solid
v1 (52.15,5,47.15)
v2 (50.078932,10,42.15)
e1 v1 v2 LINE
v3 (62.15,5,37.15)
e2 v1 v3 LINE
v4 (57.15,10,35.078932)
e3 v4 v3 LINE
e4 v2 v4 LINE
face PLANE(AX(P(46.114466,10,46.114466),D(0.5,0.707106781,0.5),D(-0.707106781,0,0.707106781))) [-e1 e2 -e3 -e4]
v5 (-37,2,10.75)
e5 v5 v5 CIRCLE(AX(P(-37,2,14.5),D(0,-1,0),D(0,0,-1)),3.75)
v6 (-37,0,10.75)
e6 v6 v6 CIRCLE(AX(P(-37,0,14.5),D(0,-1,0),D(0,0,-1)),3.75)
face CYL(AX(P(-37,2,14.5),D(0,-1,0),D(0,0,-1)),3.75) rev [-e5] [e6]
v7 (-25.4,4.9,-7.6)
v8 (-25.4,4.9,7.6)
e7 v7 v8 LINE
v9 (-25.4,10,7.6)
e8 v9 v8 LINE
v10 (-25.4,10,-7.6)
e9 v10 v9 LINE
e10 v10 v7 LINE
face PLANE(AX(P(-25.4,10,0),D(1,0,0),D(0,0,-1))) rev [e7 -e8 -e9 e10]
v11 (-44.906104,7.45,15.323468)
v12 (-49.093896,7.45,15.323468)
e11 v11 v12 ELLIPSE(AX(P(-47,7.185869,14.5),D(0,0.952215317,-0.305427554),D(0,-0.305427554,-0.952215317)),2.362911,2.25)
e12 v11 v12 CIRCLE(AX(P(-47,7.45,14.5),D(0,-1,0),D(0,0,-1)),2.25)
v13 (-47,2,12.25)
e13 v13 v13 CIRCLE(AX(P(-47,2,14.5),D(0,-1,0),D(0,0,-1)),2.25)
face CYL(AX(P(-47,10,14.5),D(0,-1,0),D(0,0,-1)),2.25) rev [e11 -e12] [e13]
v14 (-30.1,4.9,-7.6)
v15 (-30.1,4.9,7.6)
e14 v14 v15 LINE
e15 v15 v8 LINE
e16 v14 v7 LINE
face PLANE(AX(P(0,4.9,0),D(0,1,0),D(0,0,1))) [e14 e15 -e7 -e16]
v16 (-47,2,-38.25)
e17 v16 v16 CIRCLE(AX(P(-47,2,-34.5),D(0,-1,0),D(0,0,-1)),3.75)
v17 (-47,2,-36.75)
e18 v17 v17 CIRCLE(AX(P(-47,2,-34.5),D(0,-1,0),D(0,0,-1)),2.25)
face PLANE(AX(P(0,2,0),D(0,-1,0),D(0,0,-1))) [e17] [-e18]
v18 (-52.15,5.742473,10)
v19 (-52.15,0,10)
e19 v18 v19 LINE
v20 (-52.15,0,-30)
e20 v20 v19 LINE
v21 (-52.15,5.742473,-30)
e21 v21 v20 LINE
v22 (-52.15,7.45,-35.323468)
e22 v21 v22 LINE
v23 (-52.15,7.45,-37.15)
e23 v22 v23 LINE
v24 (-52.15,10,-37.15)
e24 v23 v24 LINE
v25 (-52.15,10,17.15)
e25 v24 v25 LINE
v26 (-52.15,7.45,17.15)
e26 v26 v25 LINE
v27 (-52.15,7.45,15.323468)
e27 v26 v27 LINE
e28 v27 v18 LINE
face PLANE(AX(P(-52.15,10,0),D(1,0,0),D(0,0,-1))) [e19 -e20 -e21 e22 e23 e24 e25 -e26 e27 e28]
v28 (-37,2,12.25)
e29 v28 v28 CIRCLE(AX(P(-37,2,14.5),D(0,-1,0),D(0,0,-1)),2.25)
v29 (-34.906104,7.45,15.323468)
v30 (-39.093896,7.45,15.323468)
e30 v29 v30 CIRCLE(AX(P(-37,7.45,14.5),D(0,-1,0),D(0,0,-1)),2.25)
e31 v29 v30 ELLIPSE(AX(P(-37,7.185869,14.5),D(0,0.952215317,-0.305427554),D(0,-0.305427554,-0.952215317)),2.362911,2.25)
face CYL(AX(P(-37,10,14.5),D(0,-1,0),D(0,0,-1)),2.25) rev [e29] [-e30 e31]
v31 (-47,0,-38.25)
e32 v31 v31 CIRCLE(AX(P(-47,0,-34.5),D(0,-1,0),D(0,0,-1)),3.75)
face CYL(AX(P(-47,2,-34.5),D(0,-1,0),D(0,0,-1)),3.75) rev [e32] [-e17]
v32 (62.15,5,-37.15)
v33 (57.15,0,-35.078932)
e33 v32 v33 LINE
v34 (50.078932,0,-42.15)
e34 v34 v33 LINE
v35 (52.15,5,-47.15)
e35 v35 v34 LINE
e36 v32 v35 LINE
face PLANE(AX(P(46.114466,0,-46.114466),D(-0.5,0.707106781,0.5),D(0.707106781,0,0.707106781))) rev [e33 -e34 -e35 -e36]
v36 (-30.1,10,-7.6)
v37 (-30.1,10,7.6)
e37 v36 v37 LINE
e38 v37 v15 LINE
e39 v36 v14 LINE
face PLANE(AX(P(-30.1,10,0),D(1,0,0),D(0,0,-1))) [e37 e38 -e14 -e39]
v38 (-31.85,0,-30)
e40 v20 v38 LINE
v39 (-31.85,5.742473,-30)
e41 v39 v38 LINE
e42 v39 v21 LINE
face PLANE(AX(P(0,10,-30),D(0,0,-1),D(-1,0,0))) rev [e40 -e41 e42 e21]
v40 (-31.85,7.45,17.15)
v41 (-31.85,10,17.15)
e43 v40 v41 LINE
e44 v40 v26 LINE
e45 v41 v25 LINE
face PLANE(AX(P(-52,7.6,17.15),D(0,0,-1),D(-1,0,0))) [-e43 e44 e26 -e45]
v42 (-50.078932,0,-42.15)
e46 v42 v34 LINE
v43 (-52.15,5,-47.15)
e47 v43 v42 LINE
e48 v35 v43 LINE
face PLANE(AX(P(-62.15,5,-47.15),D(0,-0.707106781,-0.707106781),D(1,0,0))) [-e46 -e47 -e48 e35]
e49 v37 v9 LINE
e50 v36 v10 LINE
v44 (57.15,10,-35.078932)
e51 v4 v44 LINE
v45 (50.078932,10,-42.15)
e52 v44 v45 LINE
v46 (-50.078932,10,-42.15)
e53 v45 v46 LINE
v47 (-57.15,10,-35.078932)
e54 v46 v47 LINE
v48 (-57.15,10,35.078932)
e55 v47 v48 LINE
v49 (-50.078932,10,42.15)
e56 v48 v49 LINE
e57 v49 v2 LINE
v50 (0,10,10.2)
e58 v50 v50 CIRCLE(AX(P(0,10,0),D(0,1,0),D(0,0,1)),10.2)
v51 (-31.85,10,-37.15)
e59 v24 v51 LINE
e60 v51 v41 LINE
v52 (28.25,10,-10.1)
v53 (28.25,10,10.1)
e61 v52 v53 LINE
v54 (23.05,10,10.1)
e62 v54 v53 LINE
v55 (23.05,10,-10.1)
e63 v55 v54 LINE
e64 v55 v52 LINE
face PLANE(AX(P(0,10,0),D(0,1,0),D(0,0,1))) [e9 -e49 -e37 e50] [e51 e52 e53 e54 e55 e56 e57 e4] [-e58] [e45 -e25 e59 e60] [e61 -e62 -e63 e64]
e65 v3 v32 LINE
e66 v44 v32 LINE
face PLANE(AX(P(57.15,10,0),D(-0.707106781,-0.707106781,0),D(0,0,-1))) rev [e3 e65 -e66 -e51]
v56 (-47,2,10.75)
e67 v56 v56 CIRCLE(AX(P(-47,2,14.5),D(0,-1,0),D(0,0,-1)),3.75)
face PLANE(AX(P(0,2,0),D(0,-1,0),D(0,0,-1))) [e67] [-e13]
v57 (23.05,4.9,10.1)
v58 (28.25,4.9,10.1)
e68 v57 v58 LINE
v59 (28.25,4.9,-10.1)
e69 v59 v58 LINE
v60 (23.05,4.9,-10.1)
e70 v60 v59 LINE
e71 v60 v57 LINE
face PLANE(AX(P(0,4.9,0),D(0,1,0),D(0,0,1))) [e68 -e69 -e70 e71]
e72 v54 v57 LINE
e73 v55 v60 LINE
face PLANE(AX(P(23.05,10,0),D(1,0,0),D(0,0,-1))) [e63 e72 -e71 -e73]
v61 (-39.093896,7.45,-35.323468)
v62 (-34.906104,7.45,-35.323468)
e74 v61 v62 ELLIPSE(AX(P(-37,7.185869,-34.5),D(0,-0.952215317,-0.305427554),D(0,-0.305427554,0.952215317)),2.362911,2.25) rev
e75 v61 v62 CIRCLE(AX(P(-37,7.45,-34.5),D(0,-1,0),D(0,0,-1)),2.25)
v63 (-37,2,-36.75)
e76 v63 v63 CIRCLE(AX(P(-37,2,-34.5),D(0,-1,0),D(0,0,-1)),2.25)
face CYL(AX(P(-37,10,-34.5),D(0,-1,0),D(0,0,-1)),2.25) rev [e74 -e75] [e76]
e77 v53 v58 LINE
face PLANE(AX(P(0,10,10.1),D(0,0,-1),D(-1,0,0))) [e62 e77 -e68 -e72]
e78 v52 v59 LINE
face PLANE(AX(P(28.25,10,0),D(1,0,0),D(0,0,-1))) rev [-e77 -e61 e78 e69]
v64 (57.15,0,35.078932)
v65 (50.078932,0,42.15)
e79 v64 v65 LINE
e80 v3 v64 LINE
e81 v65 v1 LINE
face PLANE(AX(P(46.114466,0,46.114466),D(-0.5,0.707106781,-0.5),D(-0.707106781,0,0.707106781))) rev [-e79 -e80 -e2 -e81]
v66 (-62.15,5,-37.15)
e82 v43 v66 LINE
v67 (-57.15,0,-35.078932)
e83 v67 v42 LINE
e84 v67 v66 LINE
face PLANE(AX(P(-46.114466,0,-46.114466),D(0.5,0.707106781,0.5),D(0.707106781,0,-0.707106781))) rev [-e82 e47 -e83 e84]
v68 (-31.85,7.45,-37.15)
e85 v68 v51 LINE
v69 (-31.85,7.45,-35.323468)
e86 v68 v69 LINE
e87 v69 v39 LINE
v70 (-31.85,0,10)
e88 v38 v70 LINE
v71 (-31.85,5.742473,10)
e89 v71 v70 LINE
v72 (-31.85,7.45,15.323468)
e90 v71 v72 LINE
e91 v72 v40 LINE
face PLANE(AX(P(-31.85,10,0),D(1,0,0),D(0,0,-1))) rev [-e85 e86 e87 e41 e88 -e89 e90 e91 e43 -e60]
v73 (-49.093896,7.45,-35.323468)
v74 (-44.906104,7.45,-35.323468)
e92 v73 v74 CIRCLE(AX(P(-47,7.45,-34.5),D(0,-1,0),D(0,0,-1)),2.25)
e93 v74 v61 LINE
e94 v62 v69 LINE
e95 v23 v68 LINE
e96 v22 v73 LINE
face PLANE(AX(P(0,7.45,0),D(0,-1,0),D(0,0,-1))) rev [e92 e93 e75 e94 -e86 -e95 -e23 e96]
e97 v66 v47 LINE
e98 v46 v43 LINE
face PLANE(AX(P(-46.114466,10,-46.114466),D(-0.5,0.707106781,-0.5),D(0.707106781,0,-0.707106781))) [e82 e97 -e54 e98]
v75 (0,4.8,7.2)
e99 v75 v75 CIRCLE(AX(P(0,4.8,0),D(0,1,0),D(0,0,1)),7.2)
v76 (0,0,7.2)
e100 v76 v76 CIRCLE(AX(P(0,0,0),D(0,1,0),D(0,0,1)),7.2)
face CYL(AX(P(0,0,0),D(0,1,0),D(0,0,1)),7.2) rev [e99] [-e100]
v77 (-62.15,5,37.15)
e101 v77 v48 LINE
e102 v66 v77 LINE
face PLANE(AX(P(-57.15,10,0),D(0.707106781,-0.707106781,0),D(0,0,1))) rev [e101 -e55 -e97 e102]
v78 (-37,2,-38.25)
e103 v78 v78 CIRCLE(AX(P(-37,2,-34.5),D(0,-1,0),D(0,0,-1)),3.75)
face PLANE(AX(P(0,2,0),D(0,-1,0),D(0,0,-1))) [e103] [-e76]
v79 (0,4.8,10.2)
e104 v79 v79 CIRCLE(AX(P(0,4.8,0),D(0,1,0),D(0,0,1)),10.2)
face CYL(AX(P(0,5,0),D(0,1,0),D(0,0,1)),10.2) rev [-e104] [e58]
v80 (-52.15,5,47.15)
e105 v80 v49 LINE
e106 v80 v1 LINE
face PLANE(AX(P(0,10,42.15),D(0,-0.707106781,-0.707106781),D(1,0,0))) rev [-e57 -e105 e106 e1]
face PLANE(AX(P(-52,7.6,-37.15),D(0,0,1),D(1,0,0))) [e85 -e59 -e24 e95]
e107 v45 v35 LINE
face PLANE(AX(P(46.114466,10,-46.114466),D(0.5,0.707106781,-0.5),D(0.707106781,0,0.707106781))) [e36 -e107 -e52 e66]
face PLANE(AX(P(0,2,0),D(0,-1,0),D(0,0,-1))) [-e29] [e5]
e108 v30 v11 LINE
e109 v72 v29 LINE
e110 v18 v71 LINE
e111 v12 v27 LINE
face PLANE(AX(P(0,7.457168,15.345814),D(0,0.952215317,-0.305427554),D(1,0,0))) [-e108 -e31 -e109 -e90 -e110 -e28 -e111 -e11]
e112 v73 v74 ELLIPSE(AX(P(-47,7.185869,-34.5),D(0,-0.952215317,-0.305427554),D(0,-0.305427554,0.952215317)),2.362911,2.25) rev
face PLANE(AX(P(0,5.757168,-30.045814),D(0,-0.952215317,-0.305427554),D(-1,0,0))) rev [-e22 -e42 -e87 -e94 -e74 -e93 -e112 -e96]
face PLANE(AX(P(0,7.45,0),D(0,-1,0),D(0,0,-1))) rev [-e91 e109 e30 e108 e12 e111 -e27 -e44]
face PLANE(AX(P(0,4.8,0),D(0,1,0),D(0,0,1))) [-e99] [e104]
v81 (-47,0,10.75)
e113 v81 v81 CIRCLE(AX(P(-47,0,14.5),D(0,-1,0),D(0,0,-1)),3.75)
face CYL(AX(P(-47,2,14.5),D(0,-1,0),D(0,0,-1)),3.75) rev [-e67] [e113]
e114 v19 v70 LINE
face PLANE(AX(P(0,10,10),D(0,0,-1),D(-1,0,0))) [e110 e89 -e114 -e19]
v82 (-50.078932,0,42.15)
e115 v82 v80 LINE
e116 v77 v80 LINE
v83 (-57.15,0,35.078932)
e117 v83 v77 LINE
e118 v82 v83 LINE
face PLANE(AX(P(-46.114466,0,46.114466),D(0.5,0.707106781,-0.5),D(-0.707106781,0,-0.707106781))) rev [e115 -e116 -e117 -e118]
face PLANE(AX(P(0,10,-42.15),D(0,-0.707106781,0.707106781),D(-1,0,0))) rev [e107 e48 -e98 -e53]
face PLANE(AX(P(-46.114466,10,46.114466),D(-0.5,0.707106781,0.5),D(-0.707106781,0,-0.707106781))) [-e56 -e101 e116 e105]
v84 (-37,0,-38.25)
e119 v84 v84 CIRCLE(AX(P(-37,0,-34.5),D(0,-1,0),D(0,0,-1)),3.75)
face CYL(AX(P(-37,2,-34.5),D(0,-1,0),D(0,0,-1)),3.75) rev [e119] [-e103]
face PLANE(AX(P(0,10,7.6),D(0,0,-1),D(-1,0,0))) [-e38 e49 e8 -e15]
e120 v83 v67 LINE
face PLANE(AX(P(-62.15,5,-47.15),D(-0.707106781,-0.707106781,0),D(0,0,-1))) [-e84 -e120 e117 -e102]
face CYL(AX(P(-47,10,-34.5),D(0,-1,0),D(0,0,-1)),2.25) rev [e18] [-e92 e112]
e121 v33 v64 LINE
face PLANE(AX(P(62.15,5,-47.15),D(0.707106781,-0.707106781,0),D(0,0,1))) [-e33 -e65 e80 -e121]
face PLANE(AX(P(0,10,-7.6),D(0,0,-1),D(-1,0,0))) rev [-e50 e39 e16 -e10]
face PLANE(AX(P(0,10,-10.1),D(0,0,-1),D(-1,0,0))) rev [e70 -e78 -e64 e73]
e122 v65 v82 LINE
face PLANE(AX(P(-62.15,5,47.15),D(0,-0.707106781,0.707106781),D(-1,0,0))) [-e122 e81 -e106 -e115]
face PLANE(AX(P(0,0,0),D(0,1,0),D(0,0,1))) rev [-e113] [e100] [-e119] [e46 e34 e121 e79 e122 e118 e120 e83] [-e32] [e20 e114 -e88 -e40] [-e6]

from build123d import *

# Parameters (mm, degrees)
BASE_R                                     = 100
BASE_CIRCLE_DEPTH                          = 10
VERT_START                                 = 5
CUTOUT_W                                   = 4.6
CUTOUT_H                                   = 20
CUTOUT_W_2                                 = 0.4
CUTOUT_W_3                                 = 4.5
CUTOUT_H_2                                 = 15
VERT_SUPPORT_DEPTH                         = 137.774468788
F_1_START                                  = 23.05
F_1_OFFSET_FOR_VERT_SUPPORT_OUTLINE_W      = 5.1
F_1_OFFSET_FOR_VERT_SUPPORT_OUTLINE_H      = 20.2
F_1_OFFSET_FOR_VERT_SUPPORT_DEPTH          = 5.2
F_1_START_2                                = -30.1
F_1_OFFSET_FOR_VERT_SUPPORT_2_OUTLINE_W    = 5.1
F_1_OFFSET_FOR_VERT_SUPPORT_2_OUTLINE_H    = 15.2
F_1_OFFSET_FOR_VERT_SUPPORT_2_DEPTH        = 4.7
CUTOUT_3_W                                 = 20
CUTOUT_3_H                                 = 40
SERVO_CUTOUT_DEPTH                         = 142.774468788
SKETCH4_W                                  = 20
SKETCH4_H                                  = 54
SERVO_REST_DEPTH                           = 2.4
SERVO_SLANT_1_SIZE                         = 5.3
SERVO_SLANT_1_SIZE2                        = 1.7
SERVO_SLANT_2_SIZE                         = 1.7
SERVO_SLANT_2_SIZE2                        = 5.3
F_15_START                                 = -52.15
F_15_SERVO_PRINT_OFFSET_DEPTH              = 20.3
SKETCH6_R                                  = 2.25
M4_THREAD_CLEARANCE_WIGGLE_ROOM_DEPTH      = 142.774468788
SKETCH6_3_R                                = 3.75
M4_SOCKET_HEAD_CLEARANCE_WIGGLE_ROOM_DEPTH = 2
SKETCH5_R                                  = 10
SKETCH5_R_2                                = 7
CENTRAL_AXLE_HEAD_CUTOUT_DEPTH             = 5
SKETCH5_3_R                                = 7
AXLE_BODY_CUTOUT_DEPTH                     = 142.774468788
F_15_OFFSET_AXLE_BY                        = 0.2
F_15_OFFSET_AXLE_2_BY                      = 0.2
F_15_OFFSET_AXLE_3_BY                      = 0.2
SKETCH8_W                                  = 124.3
SKETCH8_H                                  = 94.3
INTERSECT_TOOL_DEPTH                       = 10
CORNER_CHAMFER_SIZE                        = 10
EDGE_CHAMFER_SIZE                          = 5


# Read off the part's stored shape, not the designer's step: .1 Offset for vert support, .15 Servo Print Offset
with BuildPart() as part:
    # Base → Base Circle (new body)
    with BuildSketch(Plane(origin=(0, 0, 0), x_dir=(1, 0, 0), z_dir=(0, 1, 0))):
        with Locations(Location((0, 0, 0), (0, 0, 270))):
            Circle(BASE_R)
    extrude(amount=BASE_CIRCLE_DEPTH)

    # Cutout → Vert Support (cut, through all)
    with BuildSketch(Plane(origin=(0, 0, 0), x_dir=(1, 0, 0), z_dir=(0, 1, 0)).offset(VERT_START)):
        with Locations((25.45, 0)):
            Rectangle(CUTOUT_W, CUTOUT_H)
        with Locations((27.95, 0)):
            Rectangle(CUTOUT_W_2, CUTOUT_H)
        with Locations((-27.75, 0)):
            Rectangle(CUTOUT_W_3, CUTOUT_H_2)
    extrude(amount=VERT_SUPPORT_DEPTH, mode=Mode.SUBTRACT)

    # .1 Offset for vert support outline → .1 Offset for vert support (cut)
    with BuildSketch(Plane.YZ.offset(F_1_START)):
        with Locations((7.45, 0)):
            Rectangle(F_1_OFFSET_FOR_VERT_SUPPORT_OUTLINE_W, F_1_OFFSET_FOR_VERT_SUPPORT_OUTLINE_H)
    extrude(amount=F_1_OFFSET_FOR_VERT_SUPPORT_DEPTH, mode=Mode.SUBTRACT)

    # 1 Offset for vert support 2 outline → 1 Offset for vert support 2 (cut)
    with BuildSketch(Plane.YZ.offset(F_1_START_2)):
        with Locations((7.45, 0)):
            Rectangle(F_1_OFFSET_FOR_VERT_SUPPORT_2_OUTLINE_W, F_1_OFFSET_FOR_VERT_SUPPORT_2_OUTLINE_H)
    extrude(amount=F_1_OFFSET_FOR_VERT_SUPPORT_2_DEPTH, mode=Mode.SUBTRACT)

    # Cutout<3> → Servo cutout (cut, through all)
    with BuildSketch(Plane(origin=(0, 0, 0), x_dir=(1, 0, 0), z_dir=(0, 1, 0))):
        with Locations((-42, 10)):
            Rectangle(CUTOUT_3_W, CUTOUT_3_H)
    extrude(amount=SERVO_CUTOUT_DEPTH, mode=Mode.SUBTRACT)

    # Sketch4 → Servo rest (cut)
    with BuildSketch(Plane.XZ.offset(-10)):
        with Locations((-42, -10)):
            Rectangle(SKETCH4_W, SKETCH4_H)
    extrude(amount=SERVO_REST_DEPTH, mode=Mode.SUBTRACT)

    # Servo Slant 1
    servo_slant_1_edges = [part.edges().sort_by_distance(p)[0] for p in [
        (-42, 7.6, -30),
    ]]
    servo_slant_1_side = [part.faces().sort_by_distance(p)[0] for p in [
        (-42, 7.6, -33.5),
    ]]
    chamfer(servo_slant_1_edges, length=SERVO_SLANT_1_SIZE, length2=SERVO_SLANT_1_SIZE2, reference=servo_slant_1_side[0])

    # Servo Slant 2
    servo_slant_2_edges = [part.edges().sort_by_distance(p)[0] for p in [
        (-42, 7.6, 10),
    ]]
    servo_slant_2_side = [part.faces().sort_by_distance(p)[0] for p in [
        (-42, 3.8, 10),
    ]]
    chamfer(servo_slant_2_edges, length=SERVO_SLANT_2_SIZE, length2=SERVO_SLANT_2_SIZE2, reference=servo_slant_2_side[0])

    # .15 Servo Print Offset outline → .15 Servo Print Offset (cut)
    with BuildSketch(Plane.YZ.offset(F_15_START)):
        Polygon((10, 17.15), (7.45, 17.15), (7.45, 15.323467766), (5.742472603, 10), (0, 10), (0, -30), (5.742472603, -30), (7.45, -35.323467766), (7.45, -37.15), (10, -37.15), align=None)
    extrude(amount=F_15_SERVO_PRINT_OFFSET_DEPTH, mode=Mode.SUBTRACT)

    # Sketch6 → M4 Thread Clearance + wiggle room (cut, through all)
    with BuildSketch(Plane.XZ):
        with Locations(Location((-47, -34.5, 0), (0, 0, 270))):
            Circle(SKETCH6_R)
        with Locations(Location((-37, -34.5, 0), (0, 0, 270))):
            Circle(SKETCH6_R)
        with Locations(Location((-37, 14.5, 0), (0, 0, 270))):
            Circle(SKETCH6_R)
        with Locations(Location((-47, 14.5, 0), (0, 0, 270))):
            Circle(SKETCH6_R)
    extrude(amount=-M4_THREAD_CLEARANCE_WIGGLE_ROOM_DEPTH, mode=Mode.SUBTRACT)

    # Sketch6<3> → M4 Socket Head Clearance + wiggle room (cut)
    with BuildSketch(Plane.XZ):
        with Locations(Location((-47, -34.5, 0), (0, 0, 270))):
            Circle(SKETCH6_3_R)
        with Locations(Location((-37, -34.5, 0), (0, 0, 270))):
            Circle(SKETCH6_3_R)
        with Locations(Location((-37, 14.5, 0), (0, 0, 270))):
            Circle(SKETCH6_3_R)
        with Locations(Location((-47, 14.5, 0), (0, 0, 270))):
            Circle(SKETCH6_3_R)
    extrude(amount=-M4_SOCKET_HEAD_CLEARANCE_WIGGLE_ROOM_DEPTH, mode=Mode.SUBTRACT)

    # Sketch5 → Central Axle Head cutout (cut)
    with BuildSketch(Plane(origin=(0, 10, 0), x_dir=(1, 0, 0), z_dir=(0, 1, 0))):
        with Locations(Location((0, 0, 0), (0, 0, 270))):
            Circle(SKETCH5_R)
        with Locations(Location((0, 0, 0), (0, 0, 270))):
            Circle(SKETCH5_R_2, mode=Mode.SUBTRACT)
    extrude(amount=-CENTRAL_AXLE_HEAD_CUTOUT_DEPTH, mode=Mode.SUBTRACT)

    # Sketch5<3> → Axle Body cutout (cut, through all)
    with BuildSketch(Plane(origin=(0, 10, 0), x_dir=(1, 0, 0), z_dir=(0, 1, 0))):
        with Locations(Location((0, 0, 0), (0, 0, 270))):
            Circle(SKETCH5_3_R)
    extrude(amount=-AXLE_BODY_CUTOUT_DEPTH, mode=Mode.SUBTRACT)

    # .15 Offset, Axle: a face moved inward by 0.2
    extrude(part.faces().sort_by_distance((0, 5, 8))[0], amount=F_15_OFFSET_AXLE_BY, dir=(0, -1, 0), mode=Mode.SUBTRACT)

    # 15 Offset_ Axle 2: a curved face moved inward by 0.2
    add(Solid.thicken(part.faces().sort_by_distance((0, 2.5, -7))[0], -F_15_OFFSET_AXLE_2_BY), mode=Mode.SUBTRACT)

    # 15 Offset_ Axle 3: a curved face moved inward by 0.2
    add(Solid.thicken(part.faces().sort_by_distance((0, 7.5, -10))[0], -F_15_OFFSET_AXLE_3_BY), mode=Mode.SUBTRACT)


with BuildPart() as body_2:
    # Sketch8 → Intersect Tool (new body)
    with BuildSketch(Plane(origin=(0, 10, 0), x_dir=(1, 0, 0), z_dir=(0, 1, 0))):
        Rectangle(SKETCH8_W, SKETCH8_H)
    extrude(amount=-INTERSECT_TOOL_DEPTH)


with BuildPart() as part_1:
    add(part.part)

    # Intersect with tool: intersect body 2
    add(body_2.part, mode=Mode.INTERSECT)

    # Corner Chamfer
    corner_chamfer_edges = [part_1.edges().sort_by_distance(p)[0] for p in [
        (62.15, 5, -47.15),
        (62.15, 5, 47.15),
        (-62.15, 5, 47.15),
        (-62.15, 5, -47.15),
    ]]
    chamfer(corner_chamfer_edges, length=CORNER_CHAMFER_SIZE)

    # Edge Chamfer
    edge_chamfer_edges = [part_1.edges().sort_by_distance(p)[0] for p in [
        (-57.15, 10, -42.15),
        (0, 10, -47.15),
        (57.15, 10, -42.15),
        (62.15, 10, 0),
        (57.15, 10, 42.15),
        (0, 10, 47.15),
        (-57.15, 10, 42.15),
        (-62.15, 10, 0),
        (-57.15, 0, -42.15),
        (0, 0, -47.15),
        (57.15, 0, -42.15),
        (62.15, 0, 0),
        (57.15, 0, 42.15),
        (-62.15, 0, 0),
        (-57.15, 0, 42.15),
        (0, 0, 47.15),
    ]]
    chamfer(edge_chamfer_edges, length=EDGE_CHAMFER_SIZE - 0.0001)  # a hair under: the kernel refuses the full size


solid = part_1.part
